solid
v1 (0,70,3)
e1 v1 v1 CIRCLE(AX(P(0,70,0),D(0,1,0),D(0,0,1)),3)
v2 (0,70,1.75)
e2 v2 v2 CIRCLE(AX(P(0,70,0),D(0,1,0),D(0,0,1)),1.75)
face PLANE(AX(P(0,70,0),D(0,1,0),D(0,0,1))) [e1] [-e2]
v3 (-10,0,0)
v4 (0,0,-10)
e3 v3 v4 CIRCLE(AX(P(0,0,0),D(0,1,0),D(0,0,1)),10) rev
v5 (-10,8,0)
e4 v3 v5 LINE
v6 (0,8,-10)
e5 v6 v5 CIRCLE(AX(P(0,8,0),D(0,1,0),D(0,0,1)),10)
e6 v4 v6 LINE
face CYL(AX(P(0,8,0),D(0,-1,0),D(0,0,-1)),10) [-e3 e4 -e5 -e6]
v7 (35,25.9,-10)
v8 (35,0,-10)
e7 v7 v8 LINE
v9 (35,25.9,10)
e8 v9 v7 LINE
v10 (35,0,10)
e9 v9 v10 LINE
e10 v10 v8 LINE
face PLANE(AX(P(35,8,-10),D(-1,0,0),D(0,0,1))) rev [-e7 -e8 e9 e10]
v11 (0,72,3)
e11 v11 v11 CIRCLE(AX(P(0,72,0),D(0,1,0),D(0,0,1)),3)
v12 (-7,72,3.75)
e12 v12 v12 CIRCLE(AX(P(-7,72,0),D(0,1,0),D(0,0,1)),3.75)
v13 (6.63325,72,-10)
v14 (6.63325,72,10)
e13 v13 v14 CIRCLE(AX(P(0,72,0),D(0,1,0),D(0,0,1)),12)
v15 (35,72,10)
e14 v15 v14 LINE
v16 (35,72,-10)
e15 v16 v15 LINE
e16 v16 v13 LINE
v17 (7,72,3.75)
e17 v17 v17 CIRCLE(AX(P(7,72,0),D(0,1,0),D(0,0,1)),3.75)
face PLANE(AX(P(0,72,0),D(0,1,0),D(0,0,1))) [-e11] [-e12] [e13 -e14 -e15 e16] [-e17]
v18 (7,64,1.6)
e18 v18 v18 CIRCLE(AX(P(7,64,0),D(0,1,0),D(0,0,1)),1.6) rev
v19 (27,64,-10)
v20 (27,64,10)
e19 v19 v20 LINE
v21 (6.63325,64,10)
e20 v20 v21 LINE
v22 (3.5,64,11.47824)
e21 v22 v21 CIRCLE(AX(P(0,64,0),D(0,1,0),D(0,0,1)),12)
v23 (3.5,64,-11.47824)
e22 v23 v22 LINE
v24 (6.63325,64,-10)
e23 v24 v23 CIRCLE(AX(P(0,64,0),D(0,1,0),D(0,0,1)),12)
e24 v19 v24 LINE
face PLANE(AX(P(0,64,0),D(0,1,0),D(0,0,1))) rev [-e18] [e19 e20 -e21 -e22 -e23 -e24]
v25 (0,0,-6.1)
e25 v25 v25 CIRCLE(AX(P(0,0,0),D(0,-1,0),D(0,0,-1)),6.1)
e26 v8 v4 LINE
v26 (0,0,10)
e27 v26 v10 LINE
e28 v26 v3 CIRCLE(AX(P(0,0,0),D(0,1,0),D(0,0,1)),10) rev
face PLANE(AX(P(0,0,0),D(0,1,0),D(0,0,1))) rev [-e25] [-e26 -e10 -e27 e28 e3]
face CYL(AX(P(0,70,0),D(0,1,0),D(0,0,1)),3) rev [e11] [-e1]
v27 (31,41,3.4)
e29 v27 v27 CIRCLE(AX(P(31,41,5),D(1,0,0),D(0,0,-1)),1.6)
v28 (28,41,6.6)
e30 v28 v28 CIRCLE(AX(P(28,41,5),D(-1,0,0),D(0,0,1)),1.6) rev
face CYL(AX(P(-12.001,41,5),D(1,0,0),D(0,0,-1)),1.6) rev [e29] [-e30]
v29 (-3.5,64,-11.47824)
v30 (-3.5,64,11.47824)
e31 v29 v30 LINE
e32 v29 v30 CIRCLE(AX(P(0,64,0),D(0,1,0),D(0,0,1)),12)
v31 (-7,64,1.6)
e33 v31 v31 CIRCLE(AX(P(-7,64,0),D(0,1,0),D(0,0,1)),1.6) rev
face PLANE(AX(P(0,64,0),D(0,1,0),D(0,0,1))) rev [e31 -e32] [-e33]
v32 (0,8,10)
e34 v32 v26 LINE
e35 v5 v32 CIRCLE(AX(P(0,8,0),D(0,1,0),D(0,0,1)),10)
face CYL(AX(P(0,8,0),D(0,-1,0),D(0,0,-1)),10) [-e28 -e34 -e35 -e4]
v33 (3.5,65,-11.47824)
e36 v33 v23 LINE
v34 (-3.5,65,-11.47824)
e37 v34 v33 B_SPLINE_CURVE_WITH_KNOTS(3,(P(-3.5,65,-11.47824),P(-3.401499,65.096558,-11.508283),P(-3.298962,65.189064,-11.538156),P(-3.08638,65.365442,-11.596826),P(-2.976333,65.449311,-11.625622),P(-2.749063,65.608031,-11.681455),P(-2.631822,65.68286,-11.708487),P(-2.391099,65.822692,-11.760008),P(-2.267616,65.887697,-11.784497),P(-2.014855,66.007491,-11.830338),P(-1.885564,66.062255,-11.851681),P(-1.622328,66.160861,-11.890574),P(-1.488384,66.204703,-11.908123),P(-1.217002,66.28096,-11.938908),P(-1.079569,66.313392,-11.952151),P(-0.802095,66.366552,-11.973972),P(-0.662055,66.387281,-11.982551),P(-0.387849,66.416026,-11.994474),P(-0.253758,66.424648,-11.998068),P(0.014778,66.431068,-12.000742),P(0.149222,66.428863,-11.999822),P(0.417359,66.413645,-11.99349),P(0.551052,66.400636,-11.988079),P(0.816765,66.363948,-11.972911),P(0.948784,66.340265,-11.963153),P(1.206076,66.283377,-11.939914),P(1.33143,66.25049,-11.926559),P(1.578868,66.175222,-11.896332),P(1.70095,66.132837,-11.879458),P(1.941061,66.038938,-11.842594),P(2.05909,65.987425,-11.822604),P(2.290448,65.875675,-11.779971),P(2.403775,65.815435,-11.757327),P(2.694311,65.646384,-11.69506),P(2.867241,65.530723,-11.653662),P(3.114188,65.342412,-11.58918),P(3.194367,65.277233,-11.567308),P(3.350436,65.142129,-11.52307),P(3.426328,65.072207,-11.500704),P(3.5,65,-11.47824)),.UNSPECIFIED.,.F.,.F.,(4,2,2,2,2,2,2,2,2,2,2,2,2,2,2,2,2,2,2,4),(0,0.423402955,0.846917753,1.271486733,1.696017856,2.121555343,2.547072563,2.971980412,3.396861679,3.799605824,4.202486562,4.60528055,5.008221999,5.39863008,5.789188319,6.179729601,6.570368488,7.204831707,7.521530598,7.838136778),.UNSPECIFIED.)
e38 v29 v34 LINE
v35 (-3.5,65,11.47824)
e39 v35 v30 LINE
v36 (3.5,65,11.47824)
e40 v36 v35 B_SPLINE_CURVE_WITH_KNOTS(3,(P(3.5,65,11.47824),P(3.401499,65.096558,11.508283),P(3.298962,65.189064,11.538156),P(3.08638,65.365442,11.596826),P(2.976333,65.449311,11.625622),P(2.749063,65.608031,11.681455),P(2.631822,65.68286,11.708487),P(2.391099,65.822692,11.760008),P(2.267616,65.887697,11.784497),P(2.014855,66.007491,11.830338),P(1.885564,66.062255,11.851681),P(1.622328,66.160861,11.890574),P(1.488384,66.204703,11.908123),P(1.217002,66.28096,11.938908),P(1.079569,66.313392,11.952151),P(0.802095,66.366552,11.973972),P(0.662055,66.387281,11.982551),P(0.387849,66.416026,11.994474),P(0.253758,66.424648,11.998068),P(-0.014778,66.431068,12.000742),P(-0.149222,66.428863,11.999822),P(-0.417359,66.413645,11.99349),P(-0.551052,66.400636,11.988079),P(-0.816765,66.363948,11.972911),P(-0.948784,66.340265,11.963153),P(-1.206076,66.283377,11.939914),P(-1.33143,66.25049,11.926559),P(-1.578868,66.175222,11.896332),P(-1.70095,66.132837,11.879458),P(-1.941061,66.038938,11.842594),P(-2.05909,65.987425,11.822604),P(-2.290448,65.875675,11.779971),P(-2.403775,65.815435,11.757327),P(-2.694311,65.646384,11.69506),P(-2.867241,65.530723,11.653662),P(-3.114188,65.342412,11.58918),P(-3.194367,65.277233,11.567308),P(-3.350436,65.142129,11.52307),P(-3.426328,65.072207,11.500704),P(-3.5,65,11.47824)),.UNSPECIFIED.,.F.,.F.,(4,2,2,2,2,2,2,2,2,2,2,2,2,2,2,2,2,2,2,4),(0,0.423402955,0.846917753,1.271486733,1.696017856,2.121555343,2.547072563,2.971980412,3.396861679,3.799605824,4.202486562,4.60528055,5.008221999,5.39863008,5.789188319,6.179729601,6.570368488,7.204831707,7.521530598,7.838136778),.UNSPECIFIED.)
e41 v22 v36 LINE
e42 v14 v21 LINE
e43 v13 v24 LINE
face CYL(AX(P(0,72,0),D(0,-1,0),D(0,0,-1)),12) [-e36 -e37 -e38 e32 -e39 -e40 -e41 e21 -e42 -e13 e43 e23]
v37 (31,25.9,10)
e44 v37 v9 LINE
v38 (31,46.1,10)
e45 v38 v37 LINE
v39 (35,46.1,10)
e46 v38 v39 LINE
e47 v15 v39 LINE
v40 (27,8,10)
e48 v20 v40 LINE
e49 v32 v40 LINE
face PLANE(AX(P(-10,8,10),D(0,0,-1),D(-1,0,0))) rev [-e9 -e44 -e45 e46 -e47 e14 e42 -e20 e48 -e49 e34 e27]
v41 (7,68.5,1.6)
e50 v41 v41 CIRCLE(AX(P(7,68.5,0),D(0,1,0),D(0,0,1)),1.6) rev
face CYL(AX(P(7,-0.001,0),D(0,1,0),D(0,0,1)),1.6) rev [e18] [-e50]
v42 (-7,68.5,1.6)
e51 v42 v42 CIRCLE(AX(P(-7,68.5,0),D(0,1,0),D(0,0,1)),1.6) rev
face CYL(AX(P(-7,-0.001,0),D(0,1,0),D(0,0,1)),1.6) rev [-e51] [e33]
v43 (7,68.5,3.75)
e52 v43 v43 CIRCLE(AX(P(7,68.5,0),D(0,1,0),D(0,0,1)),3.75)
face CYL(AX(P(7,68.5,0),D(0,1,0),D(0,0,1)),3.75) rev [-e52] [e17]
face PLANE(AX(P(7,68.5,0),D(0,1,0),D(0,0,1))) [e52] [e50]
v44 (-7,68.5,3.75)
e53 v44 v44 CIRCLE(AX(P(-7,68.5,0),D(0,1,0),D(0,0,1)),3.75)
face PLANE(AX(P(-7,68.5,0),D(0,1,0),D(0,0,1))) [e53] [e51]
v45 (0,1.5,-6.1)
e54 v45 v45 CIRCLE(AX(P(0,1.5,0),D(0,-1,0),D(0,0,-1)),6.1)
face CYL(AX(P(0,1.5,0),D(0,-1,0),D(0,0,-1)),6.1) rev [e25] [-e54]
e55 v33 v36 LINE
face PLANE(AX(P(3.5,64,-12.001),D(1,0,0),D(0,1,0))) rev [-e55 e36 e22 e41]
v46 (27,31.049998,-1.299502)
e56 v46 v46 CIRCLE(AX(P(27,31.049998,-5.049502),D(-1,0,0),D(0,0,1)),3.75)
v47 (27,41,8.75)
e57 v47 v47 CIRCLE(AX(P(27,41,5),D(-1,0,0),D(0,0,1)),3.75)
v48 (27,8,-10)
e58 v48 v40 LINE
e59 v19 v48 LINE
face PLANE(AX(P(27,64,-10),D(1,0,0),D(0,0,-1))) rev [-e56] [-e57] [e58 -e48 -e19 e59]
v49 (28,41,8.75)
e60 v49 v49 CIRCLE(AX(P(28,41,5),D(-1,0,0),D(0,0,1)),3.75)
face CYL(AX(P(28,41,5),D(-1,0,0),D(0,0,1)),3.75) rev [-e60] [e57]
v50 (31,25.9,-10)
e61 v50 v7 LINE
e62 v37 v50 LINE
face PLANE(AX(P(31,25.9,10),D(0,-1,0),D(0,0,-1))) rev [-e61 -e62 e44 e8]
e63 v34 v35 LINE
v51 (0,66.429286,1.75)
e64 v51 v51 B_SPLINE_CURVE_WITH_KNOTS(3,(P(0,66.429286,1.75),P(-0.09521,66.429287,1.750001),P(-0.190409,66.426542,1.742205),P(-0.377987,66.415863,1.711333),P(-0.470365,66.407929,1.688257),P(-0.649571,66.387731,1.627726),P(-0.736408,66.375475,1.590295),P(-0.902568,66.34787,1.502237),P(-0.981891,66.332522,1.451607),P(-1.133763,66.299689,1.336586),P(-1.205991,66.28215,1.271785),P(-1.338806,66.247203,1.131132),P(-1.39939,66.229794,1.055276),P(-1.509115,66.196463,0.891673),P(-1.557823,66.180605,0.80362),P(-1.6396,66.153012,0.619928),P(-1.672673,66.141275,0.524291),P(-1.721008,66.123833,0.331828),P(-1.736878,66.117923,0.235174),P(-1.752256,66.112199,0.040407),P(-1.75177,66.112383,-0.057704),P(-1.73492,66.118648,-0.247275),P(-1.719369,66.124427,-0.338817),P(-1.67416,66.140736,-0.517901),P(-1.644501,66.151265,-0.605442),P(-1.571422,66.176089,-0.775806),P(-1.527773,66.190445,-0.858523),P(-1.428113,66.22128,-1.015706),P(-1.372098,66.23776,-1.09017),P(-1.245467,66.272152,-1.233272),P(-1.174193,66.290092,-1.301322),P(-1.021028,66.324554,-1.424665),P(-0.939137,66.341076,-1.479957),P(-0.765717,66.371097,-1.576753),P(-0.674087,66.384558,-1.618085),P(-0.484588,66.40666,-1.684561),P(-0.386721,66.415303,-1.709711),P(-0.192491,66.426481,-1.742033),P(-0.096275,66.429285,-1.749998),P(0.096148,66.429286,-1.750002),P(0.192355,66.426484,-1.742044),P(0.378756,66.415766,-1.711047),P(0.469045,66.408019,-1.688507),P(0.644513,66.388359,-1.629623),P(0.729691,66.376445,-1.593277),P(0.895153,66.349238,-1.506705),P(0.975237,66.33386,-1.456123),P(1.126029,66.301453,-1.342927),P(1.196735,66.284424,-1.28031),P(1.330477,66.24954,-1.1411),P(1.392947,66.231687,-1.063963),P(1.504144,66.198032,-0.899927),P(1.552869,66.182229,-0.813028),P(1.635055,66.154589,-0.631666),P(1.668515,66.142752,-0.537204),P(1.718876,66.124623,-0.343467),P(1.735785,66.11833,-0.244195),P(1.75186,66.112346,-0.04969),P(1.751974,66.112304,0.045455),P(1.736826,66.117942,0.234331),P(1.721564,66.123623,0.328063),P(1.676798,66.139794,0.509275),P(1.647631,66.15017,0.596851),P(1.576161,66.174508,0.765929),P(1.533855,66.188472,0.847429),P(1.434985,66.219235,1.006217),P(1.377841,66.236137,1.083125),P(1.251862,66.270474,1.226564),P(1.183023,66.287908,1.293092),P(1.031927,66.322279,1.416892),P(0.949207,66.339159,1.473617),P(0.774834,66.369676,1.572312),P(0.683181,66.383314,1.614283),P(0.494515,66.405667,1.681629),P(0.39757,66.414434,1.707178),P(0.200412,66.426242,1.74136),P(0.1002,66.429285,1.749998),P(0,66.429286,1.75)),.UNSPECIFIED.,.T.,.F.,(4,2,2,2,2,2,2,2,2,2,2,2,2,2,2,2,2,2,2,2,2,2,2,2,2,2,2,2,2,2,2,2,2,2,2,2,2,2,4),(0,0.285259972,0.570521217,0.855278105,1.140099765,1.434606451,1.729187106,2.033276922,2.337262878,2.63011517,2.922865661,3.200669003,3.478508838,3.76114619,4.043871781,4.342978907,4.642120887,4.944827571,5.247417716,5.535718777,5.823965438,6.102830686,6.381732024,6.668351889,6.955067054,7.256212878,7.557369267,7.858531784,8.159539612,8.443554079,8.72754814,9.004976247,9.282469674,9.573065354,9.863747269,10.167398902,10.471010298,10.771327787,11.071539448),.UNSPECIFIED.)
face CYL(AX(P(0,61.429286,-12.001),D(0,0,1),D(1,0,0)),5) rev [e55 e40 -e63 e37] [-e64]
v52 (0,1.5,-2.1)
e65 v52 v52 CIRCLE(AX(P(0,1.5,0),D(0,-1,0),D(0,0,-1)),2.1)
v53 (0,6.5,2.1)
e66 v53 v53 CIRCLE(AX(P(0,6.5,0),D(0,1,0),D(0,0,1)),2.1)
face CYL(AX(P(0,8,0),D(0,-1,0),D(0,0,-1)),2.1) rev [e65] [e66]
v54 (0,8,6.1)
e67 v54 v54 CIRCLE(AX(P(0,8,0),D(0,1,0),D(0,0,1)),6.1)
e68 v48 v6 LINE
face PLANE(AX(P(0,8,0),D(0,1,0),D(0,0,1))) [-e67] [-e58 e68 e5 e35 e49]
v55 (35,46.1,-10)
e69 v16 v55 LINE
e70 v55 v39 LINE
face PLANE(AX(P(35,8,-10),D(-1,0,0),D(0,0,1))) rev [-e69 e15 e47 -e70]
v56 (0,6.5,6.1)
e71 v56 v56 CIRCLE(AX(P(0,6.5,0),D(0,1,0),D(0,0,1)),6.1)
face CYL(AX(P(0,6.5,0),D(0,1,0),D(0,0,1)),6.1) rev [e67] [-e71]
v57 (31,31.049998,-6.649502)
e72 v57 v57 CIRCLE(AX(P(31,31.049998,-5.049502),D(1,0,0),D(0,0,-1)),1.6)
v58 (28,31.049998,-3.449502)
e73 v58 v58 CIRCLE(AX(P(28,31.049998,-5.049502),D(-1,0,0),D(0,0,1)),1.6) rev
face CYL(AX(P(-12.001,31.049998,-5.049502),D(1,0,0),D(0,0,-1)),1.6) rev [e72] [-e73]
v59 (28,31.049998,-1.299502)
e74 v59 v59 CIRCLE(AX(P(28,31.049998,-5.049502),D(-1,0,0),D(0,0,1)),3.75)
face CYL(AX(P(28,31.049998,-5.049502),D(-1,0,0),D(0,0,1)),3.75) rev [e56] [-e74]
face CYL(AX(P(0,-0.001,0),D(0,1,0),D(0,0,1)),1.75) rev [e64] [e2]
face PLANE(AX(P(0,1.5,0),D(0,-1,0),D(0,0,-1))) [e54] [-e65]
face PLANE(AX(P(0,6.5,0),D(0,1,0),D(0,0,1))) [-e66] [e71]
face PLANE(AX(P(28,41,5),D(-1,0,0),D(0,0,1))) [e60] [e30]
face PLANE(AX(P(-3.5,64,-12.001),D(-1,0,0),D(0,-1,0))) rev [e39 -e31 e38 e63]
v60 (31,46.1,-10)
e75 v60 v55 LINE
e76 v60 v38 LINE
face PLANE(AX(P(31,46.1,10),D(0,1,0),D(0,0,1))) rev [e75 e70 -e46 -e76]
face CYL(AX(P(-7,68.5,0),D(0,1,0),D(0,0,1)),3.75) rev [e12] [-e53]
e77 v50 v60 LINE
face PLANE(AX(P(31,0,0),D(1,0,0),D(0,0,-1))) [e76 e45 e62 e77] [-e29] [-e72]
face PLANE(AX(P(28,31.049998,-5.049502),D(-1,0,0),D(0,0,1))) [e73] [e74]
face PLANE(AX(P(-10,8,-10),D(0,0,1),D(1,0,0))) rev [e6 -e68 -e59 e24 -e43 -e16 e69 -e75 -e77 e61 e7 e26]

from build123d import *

# Parameters (mm, degrees)
SZKIC1_W                        = 45
SZKIC1_H                        = 20
SZKIC1_R                        = 2.1
DODANIE_WYCI_GNI_CIE1_DEPTH     = 8
SZKIC2_R                        = 6.1
WYTNIJ_WYCI_GNI_CIE1_DEPTH      = 1.5
WYTNIJ_WYCI_GNI_CIE2_START      = -1.5
SZKIC3_R                        = 6.1
WYTNIJ_WYCI_GNI_CIE2_DEPTH      = 1.5
SZKIC4_W                        = 8
SZKIC4_H                        = 20
DODANIE_WYCI_GNI_CIE2_DEPTH     = 56
ZAOKR_GLENIE1_R                 = 10
DODANIE_WYCI_GNI_CIE3_DEPTH     = 8
WYTNIJ_WYCI_GNI_CIE3_REACH      = 82.951
SZKIC6_R                        = 1.6
SZKIC7_R                        = 3.75
WYTNIJ_WYCI_GNI_CIE4_DEPTH      = 3.5
WYTNIJ_WYCI_GNI_CIE5_REACH      = 85.576
WYTNIJ_WYCI_GNI_CIE5_END_RADIUS = 12
SZKIC10_R                       = 3
WYTNIJ_WYCI_GNI_CIE6_DEPTH      = 2
WYTNIJ_WYCI_GNI_CIE7_REACH      = 81.177
WYTNIJ_WYCI_GNI_CIE7_END_RADIUS = 5
SZKIC11_R                       = 1.75
SZKIC12_W                       = 20
SZKIC12_H                       = 20.2
WYTNIJ_WYCI_GNI_CIE8_DEPTH      = 4
WYTNIJ_WYCI_GNI_CIE9_REACH      = 86.717
SZKIC13_R                       = 1.6
SZKIC14_R                       = 3.75
WYTNIJ_WYCI_GNI_CIE10_DEPTH     = 1


with BuildPart() as part:
    # Szkic1 → Dodanie-wyciągnięcie1 (new body)
    with BuildSketch(Plane(origin=(0, 0, 0), x_dir=(1, 0, 0), z_dir=(0, 1, 0))):
        with Locations((12.5, 0)):
            Rectangle(SZKIC1_W, SZKIC1_H)
        with Locations(Location((0, 0, 0), (0, 0, 270))):
            Circle(SZKIC1_R, mode=Mode.SUBTRACT)
    extrude(amount=DODANIE_WYCI_GNI_CIE1_DEPTH)

    # Szkic2 → Wytnij-wyciągnięcie1 (cut)
    with BuildSketch(Plane(origin=(0, 8, 0), x_dir=(1, 0, 0), z_dir=(0, 1, 0))):
        with Locations(Location((0, 0, 0), (0, 0, 270))):
            Circle(SZKIC2_R)
    extrude(amount=-WYTNIJ_WYCI_GNI_CIE1_DEPTH, mode=Mode.SUBTRACT)

    # Szkic3 → Wytnij-wyciągnięcie2 (cut)
    with BuildSketch(Plane.XZ.offset(WYTNIJ_WYCI_GNI_CIE2_START)):
        with Locations(Location((0, 0, 0), (0, 0, 90))):
            Circle(SZKIC3_R)
    extrude(amount=WYTNIJ_WYCI_GNI_CIE2_DEPTH, mode=Mode.SUBTRACT)

    # Szkic4 → Dodanie-wyciągnięcie2 (add)
    with BuildSketch(Plane(origin=(0, 8, 0), x_dir=(1, 0, 0), z_dir=(0, 1, 0))):
        with Locations((31, 0)):
            Rectangle(SZKIC4_W, SZKIC4_H)
    extrude(amount=DODANIE_WYCI_GNI_CIE2_DEPTH)

    # Zaokrąglenie1
    zaokr_glenie1_edges = [part.edges().sort_by_distance(p)[0] for p in [
        (-10, 4, -10),
        (-10, 4, 10),
    ]]
    fillet(zaokr_glenie1_edges, radius=ZAOKR_GLENIE1_R - 0.0001)  # a hair under: the kernel refuses the full size

    # Szkic5 → Dodanie-wyciągnięcie3 (add)
    with BuildSketch(Plane(origin=(0, 64, 0), x_dir=(1, 0, 0), z_dir=(0, 1, 0))):
        with BuildLine():
            Line((35, -10), (35, 10))
            Line((35, 10), (6.633249581, 10))
            ThreePointArc((6.633249581, 10), (-12, 0), (6.633249581, -10))
            Line((6.633249581, -10), (35, -10))
        make_face()
    extrude(amount=DODANIE_WYCI_GNI_CIE3_DEPTH)

    # Szkic6 → Wytnij-wyciągnięcie3 (cut, up to next)
    with BuildSketch(Plane(origin=(0, 72, 0), x_dir=(1, 0, 0), z_dir=(0, 1, 0)), mode=Mode.PRIVATE) as wytnij_wyci_gni_cie3_sk1:
        with Locations(Location((-7, 0, 0), (0, 0, 270))):
            Circle(SZKIC6_R)
    wytnij_wyci_gni_cie3_tool1 = extrude(wytnij_wyci_gni_cie3_sk1.sketch, amount=-WYTNIJ_WYCI_GNI_CIE3_REACH, mode=Mode.PRIVATE) & part.part
    # Szkic6 → Wytnij-wyciągnięcie3 (cut, up to next)
    with BuildSketch(Plane(origin=(0, 72, 0), x_dir=(1, 0, 0), z_dir=(0, 1, 0)), mode=Mode.PRIVATE) as wytnij_wyci_gni_cie3_sk2:
        with Locations(Location((7, 0, 0), (0, 0, 270))):
            Circle(SZKIC6_R)
    wytnij_wyci_gni_cie3_tool2 = extrude(wytnij_wyci_gni_cie3_sk2.sketch, amount=-WYTNIJ_WYCI_GNI_CIE3_REACH, mode=Mode.PRIVATE) & part.part
    add(wytnij_wyci_gni_cie3_tool1.solids().sort_by_distance((-7, 72, 0))[0], mode=Mode.SUBTRACT)
    add(wytnij_wyci_gni_cie3_tool2.solids().sort_by_distance((7, 72, 0))[0], mode=Mode.SUBTRACT)

    # Szkic7 → Wytnij-wyciągnięcie4 (cut)
    with BuildSketch(Plane(origin=(0, 72, 0), x_dir=(1, 0, 0), z_dir=(0, 1, 0))):
        with Locations(Location((7, 0, 0), (0, 0, 270))):
            Circle(SZKIC7_R)
        with Locations(Location((-7, 0, 0), (0, 0, 270))):
            Circle(SZKIC7_R)
    extrude(amount=-WYTNIJ_WYCI_GNI_CIE4_DEPTH, mode=Mode.SUBTRACT)

    # Wytnij-wyciągnięcie5: up to this cylinder (the profile starts inside it)
    wytnij_wyci_gni_cie5_end = Plane(origin=(0, 65.035303, 0), z_dir=(0, -1, 0)) * Cylinder(WYTNIJ_WYCI_GNI_CIE5_END_RADIUS, 196.152, mode=Mode.PRIVATE)
    # Szkic9 → Wytnij-wyciągnięcie5 (cut, up to the surface)
    with BuildSketch(Plane.XY.offset(12), mode=Mode.PRIVATE) as wytnij_wyci_gni_cie5_sk1:
        with BuildLine():
            Line((-3.5, 64), (3.5, 64))
            Line((3.5, 64), (3.5, 65))
            ThreePointArc((3.5, 65), (0, 66.429285786), (-3.5, 65))
            Line((-3.5, 65), (-3.5, 64))
        make_face()
    wytnij_wyci_gni_cie5_tool1 = extrude(wytnij_wyci_gni_cie5_sk1.sketch, amount=-WYTNIJ_WYCI_GNI_CIE5_REACH, mode=Mode.PRIVATE) & wytnij_wyci_gni_cie5_end
    add(wytnij_wyci_gni_cie5_tool1.solids().sort_by_distance((0, 65.035303, 12))[0], mode=Mode.SUBTRACT)

    # Szkic10 → Wytnij-wyciągnięcie6 (cut)
    with BuildSketch(Plane(origin=(0, 72, 0), x_dir=(1, 0, 0), z_dir=(0, 1, 0))):
        with Locations(Location((0, 0, 0), (0, 0, 270))):
            Circle(SZKIC10_R)
    extrude(amount=-WYTNIJ_WYCI_GNI_CIE6_DEPTH, mode=Mode.SUBTRACT)

    # Wytnij-wyciągnięcie7: up to this cylinder (the profile starts outside it)
    wytnij_wyci_gni_cie7_end = Plane(origin=(0, 61.429285786, 0), z_dir=(0, 0, 1)) * Cylinder(WYTNIJ_WYCI_GNI_CIE7_END_RADIUS, 173.354, mode=Mode.PRIVATE)
    # Szkic11 → Wytnij-wyciągnięcie7 (cut, up to the surface)
    with BuildSketch(Plane(origin=(0, 70, 0), x_dir=(1, 0, 0), z_dir=(0, 1, 0)), mode=Mode.PRIVATE) as wytnij_wyci_gni_cie7_sk1:
        with Locations(Location((0, 0, 0), (0, 0, 270))):
            Circle(SZKIC11_R)
    wytnij_wyci_gni_cie7_tool1 = extrude(wytnij_wyci_gni_cie7_sk1.sketch, amount=-WYTNIJ_WYCI_GNI_CIE7_REACH, mode=Mode.PRIVATE) - wytnij_wyci_gni_cie7_end
    add(wytnij_wyci_gni_cie7_tool1.solids().sort_by_distance((0, 70, 0))[0], mode=Mode.SUBTRACT)

    # Szkic12 → Wytnij-wyciągnięcie8 (cut)
    with BuildSketch(Plane(origin=(35, 0, 0), x_dir=(0, 0, -1), z_dir=(1, 0, 0))):
        with Locations((0, 36)):
            Rectangle(SZKIC12_W, SZKIC12_H)
    extrude(amount=-WYTNIJ_WYCI_GNI_CIE8_DEPTH, mode=Mode.SUBTRACT)

    # Szkic13 → Wytnij-wyciągnięcie9 (cut, up to next)
    with BuildSketch(Plane(origin=(31, 0, 0), x_dir=(0, 0, -1), z_dir=(1, 0, 0)), mode=Mode.PRIVATE) as wytnij_wyci_gni_cie9_sk1:
        with Locations((-5, 41)):
            Circle(SZKIC13_R)
    wytnij_wyci_gni_cie9_tool1 = extrude(wytnij_wyci_gni_cie9_sk1.sketch, amount=-WYTNIJ_WYCI_GNI_CIE9_REACH, mode=Mode.PRIVATE) & part.part
    # Szkic13 → Wytnij-wyciągnięcie9 (cut, up to next)
    with BuildSketch(Plane(origin=(31, 0, 0), x_dir=(0, 0, -1), z_dir=(1, 0, 0)), mode=Mode.PRIVATE) as wytnij_wyci_gni_cie9_sk2:
        with Locations((5.0495025, 31.049997525)):
            Circle(SZKIC13_R)
    wytnij_wyci_gni_cie9_tool2 = extrude(wytnij_wyci_gni_cie9_sk2.sketch, amount=-WYTNIJ_WYCI_GNI_CIE9_REACH, mode=Mode.PRIVATE) & part.part
    add(wytnij_wyci_gni_cie9_tool1.solids().sort_by_distance((31, 41, 5))[0], mode=Mode.SUBTRACT)
    add(wytnij_wyci_gni_cie9_tool2.solids().sort_by_distance((31, 31.049998, -5.049502))[0], mode=Mode.SUBTRACT)

    # Szkic14 → Wytnij-wyciągnięcie10 (cut)
    with BuildSketch(Plane.ZY.offset(-27)):
        with Locations((5, 41)):
            Circle(SZKIC14_R)
        with Locations((-5.0495025, 31.049997525)):
            Circle(SZKIC14_R)
    extrude(amount=-WYTNIJ_WYCI_GNI_CIE10_DEPTH, mode=Mode.SUBTRACT)


solid = part.part
